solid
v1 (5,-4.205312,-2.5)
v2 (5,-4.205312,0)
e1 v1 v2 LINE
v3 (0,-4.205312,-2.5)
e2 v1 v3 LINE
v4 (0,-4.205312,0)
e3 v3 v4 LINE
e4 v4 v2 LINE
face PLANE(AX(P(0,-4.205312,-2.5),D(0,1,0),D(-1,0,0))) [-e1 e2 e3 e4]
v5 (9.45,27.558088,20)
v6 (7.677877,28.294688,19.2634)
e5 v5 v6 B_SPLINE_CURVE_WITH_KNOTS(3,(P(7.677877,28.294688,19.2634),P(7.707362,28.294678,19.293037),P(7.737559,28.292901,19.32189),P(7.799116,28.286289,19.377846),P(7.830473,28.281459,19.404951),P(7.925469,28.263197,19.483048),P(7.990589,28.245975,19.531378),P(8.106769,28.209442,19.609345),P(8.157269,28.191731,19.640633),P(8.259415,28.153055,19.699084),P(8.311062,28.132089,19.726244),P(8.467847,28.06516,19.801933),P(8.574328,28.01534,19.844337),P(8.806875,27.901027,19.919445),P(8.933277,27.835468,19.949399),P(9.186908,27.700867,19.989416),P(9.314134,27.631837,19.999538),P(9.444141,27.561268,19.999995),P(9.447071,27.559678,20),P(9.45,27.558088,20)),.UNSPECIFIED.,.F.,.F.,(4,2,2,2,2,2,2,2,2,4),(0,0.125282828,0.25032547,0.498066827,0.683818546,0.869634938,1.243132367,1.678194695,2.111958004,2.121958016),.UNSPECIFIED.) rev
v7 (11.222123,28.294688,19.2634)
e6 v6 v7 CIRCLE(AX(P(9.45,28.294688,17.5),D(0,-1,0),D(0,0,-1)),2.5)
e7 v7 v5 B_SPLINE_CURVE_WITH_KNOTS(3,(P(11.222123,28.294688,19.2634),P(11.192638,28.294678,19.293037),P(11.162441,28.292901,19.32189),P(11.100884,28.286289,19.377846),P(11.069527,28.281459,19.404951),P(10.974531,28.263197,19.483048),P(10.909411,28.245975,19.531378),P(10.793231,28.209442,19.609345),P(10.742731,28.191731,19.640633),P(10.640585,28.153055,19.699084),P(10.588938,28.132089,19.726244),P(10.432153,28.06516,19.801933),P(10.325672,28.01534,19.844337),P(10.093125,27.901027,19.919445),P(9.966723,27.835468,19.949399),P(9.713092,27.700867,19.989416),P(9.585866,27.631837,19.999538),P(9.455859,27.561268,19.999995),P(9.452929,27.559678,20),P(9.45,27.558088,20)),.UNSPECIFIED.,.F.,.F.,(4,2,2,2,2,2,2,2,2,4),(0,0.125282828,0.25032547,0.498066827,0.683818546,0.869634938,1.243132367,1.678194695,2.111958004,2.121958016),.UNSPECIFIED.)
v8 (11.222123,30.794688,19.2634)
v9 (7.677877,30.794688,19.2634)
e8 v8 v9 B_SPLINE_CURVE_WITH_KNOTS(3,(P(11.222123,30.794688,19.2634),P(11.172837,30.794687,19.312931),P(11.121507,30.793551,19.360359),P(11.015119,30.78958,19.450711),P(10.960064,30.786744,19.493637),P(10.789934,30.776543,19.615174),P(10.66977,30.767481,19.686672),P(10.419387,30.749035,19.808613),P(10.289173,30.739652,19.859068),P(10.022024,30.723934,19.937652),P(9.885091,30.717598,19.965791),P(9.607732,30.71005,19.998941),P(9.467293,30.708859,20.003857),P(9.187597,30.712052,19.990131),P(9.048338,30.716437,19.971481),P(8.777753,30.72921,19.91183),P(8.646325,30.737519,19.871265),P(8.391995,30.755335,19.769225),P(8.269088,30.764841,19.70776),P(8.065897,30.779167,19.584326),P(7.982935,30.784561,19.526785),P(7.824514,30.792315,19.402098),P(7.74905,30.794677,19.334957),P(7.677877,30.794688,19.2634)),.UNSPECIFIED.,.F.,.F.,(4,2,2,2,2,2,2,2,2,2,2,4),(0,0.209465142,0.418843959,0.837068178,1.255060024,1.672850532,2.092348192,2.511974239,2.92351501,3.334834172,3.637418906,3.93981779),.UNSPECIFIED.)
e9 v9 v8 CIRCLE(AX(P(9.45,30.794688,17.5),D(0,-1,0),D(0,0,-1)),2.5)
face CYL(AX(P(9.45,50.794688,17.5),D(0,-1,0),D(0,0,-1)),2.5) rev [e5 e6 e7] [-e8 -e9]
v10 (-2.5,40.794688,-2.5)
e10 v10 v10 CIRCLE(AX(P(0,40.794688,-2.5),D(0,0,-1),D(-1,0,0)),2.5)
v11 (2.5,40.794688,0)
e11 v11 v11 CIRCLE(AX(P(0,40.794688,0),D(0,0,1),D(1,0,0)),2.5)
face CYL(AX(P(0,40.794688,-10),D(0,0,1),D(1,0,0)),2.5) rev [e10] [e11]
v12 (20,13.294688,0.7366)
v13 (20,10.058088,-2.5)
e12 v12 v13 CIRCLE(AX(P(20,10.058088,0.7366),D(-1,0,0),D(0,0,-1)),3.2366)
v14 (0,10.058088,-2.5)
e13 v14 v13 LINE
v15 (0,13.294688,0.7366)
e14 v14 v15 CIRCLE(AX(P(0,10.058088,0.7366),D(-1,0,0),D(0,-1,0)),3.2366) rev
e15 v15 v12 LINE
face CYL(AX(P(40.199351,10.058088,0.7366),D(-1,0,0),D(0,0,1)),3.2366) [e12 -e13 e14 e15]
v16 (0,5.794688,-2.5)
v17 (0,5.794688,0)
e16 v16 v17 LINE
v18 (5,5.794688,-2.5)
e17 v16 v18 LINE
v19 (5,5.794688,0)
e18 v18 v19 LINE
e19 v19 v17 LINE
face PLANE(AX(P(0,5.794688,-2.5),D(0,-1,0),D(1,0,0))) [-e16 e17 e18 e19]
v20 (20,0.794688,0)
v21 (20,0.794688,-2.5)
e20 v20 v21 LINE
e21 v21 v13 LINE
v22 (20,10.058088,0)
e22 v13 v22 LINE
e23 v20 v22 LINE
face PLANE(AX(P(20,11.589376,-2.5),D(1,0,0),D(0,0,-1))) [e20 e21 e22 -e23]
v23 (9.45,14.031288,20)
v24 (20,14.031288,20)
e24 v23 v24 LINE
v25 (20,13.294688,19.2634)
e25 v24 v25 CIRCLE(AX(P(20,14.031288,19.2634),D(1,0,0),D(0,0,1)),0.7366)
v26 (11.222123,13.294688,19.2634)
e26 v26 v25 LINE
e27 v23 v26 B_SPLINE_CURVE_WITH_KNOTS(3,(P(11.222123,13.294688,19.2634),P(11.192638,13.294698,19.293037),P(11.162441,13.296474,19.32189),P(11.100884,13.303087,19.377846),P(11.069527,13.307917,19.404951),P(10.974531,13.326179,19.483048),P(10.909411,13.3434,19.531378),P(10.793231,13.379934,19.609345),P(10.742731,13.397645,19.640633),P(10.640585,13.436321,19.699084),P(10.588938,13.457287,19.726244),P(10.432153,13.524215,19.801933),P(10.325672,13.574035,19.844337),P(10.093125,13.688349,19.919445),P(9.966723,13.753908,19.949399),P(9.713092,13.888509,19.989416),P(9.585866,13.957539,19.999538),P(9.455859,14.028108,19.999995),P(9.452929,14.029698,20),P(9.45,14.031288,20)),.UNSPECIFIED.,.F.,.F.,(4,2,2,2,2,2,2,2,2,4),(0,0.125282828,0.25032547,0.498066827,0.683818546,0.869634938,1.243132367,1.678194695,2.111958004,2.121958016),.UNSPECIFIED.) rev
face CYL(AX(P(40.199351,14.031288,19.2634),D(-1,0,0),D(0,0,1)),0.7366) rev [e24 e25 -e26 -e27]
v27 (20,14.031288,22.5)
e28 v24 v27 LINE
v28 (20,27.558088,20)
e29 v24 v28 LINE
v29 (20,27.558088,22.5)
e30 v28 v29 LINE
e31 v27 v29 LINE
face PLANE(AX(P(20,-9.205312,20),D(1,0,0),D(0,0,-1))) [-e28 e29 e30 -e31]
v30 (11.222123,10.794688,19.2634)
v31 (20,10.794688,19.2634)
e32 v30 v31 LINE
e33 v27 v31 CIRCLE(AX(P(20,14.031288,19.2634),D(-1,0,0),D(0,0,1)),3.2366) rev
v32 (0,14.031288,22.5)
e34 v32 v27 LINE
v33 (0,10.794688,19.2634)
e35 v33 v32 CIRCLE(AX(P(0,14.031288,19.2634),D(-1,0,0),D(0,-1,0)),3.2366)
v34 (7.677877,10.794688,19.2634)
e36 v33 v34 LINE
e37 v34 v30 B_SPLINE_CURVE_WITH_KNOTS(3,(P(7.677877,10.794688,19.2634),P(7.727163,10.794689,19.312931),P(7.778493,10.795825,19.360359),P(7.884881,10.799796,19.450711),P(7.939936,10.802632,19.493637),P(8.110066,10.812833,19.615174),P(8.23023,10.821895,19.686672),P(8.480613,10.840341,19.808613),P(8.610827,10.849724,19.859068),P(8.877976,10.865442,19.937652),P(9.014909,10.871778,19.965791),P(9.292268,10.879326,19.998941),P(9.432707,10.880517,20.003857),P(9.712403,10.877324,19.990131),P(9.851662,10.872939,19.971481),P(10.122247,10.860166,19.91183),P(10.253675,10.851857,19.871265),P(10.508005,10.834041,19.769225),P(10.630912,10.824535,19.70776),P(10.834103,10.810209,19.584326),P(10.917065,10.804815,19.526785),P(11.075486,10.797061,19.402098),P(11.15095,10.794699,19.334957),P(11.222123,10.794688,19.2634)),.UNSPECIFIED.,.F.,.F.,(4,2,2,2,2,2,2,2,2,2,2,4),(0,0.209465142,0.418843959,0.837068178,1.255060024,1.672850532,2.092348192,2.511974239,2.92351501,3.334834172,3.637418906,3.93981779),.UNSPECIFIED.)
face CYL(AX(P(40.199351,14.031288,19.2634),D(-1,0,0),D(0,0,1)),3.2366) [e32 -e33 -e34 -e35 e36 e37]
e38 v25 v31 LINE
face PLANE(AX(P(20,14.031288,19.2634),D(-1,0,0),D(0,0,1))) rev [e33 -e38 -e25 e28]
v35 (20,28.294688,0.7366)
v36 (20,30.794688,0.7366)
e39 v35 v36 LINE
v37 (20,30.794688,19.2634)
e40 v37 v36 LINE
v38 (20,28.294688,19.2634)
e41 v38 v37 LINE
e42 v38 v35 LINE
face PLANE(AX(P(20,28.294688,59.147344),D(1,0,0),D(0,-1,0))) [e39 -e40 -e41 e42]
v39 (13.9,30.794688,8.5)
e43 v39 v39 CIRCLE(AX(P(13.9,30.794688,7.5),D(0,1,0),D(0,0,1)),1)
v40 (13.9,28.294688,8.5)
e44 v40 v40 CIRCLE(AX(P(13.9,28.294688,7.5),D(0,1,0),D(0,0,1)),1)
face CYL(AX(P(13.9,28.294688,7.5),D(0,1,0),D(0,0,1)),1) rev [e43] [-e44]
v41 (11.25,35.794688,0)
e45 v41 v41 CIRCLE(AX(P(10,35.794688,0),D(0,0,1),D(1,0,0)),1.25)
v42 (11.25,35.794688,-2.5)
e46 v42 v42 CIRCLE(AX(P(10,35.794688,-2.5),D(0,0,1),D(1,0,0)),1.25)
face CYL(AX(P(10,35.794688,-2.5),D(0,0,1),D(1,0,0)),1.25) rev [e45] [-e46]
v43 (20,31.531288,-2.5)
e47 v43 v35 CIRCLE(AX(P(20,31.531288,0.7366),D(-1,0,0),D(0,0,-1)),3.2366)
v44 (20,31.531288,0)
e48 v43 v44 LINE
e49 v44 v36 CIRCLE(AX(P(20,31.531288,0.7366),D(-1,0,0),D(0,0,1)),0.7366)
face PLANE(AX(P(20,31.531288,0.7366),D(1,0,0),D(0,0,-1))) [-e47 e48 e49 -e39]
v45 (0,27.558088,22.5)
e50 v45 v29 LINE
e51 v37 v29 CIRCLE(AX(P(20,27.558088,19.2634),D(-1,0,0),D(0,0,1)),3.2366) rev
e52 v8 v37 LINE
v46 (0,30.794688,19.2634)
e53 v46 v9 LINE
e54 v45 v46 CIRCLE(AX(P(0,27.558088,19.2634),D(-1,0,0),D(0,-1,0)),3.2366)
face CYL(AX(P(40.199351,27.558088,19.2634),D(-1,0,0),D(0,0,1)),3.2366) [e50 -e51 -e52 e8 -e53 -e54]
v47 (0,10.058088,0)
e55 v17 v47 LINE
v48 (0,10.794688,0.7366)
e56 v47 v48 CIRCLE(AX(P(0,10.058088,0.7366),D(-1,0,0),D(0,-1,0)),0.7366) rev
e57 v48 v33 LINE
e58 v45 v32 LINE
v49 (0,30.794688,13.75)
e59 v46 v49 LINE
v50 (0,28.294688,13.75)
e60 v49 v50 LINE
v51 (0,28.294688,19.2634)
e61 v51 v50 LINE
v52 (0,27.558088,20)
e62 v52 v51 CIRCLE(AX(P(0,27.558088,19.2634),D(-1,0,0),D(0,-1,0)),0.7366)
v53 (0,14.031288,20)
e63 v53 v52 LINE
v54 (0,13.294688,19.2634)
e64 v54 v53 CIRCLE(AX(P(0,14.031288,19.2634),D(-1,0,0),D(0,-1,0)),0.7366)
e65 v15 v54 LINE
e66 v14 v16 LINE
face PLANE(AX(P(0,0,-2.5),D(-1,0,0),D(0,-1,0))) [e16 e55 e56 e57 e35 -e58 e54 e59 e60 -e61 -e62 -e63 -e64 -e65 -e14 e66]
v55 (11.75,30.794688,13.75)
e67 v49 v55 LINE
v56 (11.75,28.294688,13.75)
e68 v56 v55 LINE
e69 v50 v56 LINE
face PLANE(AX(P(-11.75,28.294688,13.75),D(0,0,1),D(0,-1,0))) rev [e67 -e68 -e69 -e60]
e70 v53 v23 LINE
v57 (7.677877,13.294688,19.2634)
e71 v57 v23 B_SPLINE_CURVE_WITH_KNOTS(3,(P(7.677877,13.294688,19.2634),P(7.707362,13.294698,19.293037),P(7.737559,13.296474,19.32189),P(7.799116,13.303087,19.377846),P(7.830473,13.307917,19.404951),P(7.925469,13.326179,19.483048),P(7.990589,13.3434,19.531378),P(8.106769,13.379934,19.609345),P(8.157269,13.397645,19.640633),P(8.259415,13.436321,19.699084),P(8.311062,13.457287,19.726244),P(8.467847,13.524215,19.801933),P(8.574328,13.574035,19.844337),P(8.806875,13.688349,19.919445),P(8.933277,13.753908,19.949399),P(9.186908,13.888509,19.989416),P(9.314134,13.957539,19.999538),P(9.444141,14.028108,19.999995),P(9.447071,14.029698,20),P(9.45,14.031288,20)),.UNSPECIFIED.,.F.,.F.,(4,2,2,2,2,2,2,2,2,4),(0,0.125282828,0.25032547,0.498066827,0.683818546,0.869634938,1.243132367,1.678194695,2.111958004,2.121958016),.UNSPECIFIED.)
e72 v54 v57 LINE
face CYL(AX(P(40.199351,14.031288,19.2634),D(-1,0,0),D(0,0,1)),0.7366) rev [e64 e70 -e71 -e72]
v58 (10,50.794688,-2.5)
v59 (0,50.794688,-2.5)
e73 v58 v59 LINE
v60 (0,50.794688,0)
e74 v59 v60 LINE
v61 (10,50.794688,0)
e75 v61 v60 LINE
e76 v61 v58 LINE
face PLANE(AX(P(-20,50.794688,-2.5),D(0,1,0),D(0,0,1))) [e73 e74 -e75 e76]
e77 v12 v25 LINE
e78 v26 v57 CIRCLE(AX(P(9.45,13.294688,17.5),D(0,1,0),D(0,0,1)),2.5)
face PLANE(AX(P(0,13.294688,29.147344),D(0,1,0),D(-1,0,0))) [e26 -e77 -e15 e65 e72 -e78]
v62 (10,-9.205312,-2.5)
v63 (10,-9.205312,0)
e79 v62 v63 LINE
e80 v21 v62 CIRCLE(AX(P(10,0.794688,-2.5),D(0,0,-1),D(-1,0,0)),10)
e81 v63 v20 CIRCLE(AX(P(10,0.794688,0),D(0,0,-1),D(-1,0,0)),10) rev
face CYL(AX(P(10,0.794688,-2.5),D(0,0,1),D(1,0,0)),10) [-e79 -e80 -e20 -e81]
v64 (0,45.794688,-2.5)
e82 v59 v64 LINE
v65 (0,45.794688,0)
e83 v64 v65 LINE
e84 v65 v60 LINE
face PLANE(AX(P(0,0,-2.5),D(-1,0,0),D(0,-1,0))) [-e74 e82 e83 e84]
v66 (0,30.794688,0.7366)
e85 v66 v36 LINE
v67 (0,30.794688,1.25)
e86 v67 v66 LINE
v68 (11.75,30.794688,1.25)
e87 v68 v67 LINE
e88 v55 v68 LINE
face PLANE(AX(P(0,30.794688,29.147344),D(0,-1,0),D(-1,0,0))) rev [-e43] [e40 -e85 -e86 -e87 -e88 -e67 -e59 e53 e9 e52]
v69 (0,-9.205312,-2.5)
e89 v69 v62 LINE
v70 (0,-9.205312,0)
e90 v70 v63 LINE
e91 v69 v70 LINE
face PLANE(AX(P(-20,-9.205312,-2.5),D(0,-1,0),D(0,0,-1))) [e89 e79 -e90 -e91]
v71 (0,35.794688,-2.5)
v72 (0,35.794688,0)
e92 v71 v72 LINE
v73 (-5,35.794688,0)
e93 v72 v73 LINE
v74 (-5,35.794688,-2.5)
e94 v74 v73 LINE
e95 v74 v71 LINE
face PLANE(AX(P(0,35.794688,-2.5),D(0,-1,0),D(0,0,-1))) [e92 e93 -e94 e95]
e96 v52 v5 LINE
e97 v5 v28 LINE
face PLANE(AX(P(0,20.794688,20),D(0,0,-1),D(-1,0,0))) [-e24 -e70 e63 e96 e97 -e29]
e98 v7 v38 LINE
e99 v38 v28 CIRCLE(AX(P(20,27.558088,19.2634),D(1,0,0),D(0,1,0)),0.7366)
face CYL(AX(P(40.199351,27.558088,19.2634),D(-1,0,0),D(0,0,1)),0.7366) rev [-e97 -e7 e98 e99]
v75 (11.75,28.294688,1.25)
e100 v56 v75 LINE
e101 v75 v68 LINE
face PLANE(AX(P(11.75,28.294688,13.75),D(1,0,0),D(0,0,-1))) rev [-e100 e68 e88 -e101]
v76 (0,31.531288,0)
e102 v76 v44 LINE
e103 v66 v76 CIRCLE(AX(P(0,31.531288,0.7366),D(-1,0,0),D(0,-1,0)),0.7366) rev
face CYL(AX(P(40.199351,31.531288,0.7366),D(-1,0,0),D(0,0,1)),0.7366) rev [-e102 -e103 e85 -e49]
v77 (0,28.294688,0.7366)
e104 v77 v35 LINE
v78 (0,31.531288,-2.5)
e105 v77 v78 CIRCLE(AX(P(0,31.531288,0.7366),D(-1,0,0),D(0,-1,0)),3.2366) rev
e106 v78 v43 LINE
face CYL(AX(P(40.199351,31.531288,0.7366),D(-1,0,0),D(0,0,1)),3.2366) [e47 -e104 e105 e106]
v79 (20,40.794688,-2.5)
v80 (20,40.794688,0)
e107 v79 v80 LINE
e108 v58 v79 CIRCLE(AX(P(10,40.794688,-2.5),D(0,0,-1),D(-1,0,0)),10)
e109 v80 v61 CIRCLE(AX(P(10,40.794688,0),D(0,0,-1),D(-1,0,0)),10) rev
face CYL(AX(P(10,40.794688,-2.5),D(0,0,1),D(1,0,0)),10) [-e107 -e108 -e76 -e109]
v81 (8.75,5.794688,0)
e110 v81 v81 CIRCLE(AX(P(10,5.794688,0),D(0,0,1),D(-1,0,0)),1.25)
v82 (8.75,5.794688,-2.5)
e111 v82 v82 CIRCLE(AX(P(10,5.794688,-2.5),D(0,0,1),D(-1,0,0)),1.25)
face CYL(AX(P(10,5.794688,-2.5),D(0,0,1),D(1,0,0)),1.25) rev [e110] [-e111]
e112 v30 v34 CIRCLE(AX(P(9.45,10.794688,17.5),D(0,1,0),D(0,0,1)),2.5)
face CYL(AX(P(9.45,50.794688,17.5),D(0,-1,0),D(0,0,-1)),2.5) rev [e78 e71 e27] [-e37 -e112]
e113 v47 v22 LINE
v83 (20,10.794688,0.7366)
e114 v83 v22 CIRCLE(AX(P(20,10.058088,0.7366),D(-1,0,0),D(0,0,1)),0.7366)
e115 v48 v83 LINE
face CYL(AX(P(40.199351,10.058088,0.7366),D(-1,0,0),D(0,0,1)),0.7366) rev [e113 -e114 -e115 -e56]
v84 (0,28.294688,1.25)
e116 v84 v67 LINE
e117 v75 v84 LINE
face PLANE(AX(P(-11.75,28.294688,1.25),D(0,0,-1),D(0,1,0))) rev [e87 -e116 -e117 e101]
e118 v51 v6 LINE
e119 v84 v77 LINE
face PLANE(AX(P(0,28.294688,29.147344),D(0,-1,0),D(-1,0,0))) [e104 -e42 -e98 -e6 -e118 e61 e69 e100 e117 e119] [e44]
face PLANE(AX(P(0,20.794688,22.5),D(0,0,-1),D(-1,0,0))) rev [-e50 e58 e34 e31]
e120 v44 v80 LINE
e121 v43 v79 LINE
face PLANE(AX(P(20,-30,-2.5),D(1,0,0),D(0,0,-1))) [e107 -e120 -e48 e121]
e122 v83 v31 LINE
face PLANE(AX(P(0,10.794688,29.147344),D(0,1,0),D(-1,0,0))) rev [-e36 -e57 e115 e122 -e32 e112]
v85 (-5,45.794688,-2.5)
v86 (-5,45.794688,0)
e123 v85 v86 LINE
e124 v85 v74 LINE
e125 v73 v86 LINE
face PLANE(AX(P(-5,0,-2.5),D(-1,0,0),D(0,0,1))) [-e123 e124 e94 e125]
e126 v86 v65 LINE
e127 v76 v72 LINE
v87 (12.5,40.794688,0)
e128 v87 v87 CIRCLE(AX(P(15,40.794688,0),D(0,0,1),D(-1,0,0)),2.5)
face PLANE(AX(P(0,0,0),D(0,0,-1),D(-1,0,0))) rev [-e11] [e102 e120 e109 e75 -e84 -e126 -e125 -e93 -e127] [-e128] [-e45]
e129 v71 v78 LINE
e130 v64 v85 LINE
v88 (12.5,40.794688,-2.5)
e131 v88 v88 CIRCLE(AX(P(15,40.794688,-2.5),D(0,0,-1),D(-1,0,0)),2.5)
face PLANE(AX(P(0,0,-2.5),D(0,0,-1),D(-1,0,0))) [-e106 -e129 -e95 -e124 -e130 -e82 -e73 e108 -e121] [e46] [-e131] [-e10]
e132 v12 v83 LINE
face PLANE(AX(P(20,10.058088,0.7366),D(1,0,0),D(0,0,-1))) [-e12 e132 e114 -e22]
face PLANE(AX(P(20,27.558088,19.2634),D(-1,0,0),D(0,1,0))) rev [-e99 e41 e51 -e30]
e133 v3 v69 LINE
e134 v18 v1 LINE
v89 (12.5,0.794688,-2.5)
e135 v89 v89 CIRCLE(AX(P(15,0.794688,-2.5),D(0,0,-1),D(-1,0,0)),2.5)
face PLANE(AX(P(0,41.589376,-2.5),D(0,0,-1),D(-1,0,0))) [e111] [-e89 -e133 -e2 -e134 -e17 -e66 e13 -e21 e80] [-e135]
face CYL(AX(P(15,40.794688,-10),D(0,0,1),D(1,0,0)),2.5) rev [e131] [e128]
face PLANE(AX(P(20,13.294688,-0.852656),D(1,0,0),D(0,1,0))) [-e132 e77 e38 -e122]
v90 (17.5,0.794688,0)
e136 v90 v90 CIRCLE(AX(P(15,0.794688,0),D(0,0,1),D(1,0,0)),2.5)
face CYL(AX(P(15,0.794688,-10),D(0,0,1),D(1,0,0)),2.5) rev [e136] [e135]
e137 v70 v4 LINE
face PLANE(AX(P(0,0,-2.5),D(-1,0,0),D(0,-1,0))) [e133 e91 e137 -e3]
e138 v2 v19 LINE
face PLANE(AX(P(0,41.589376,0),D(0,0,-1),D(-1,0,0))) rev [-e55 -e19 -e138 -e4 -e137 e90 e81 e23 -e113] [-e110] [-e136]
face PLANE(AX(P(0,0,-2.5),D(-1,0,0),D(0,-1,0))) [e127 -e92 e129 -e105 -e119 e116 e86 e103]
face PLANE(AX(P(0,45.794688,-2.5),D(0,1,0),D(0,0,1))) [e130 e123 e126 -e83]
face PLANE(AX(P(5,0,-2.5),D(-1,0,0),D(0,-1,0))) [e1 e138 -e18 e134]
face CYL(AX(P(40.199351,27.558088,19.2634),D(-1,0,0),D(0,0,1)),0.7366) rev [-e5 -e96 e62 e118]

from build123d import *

# Parameters (mm, degrees)
SKETCH1_W           = 40
SKETCH1_H           = 60
SKETCH1_R           = 1.25
BASE_FLANGE1_DEPTH  = 2.5
SKETCH15_R          = 1
CUT_EXTRUDE3_DEPTH  = 10
JOG3_START          = -2.5
JOG3_OUTLINE_W      = 40
JOG3_OUTLINE_H      = 58.294687966
JOG3_OUTLINE_R      = 1
JOG3_OUTLINE_R_2    = 1.25
JOG3_DEPTH          = 2.5
JOG3_2_OUTLINE_W    = 40
JOG3_2_OUTLINE_H    = 1.705312034
JOG3_2_DEPTH        = 0.332528284
JOG3_START_2        = 19.2634
JOG3_3_OUTLINE_W    = 40
JOG3_3_OUTLINE_H    = 40
JOG3_3_OUTLINE_R    = 1
JOG3_3_OUTLINE_R_2  = 1.25
JOG3_3_DEPTH        = 3.2366
JOG3_4_OUTLINE_W    = 40
JOG3_4_OUTLINE_H    = 20.794687966
JOG3_4_OUTLINE_R    = 1.25
JOG3_4_DEPTH        = 3.2366
JOG3_5_OUTLINE_W    = 40
JOG3_5_OUTLINE_H    = 2.5
JOG3_5_DEPTH        = 20
JOG3_START_3        = 20
JOG3_6_OUTLINE_R    = 1.25
JOG3_6_OUTLINE_R_2  = 1
JOG3_6_DEPTH        = 2.5
JOG3_START_4        = -20
JOG3_7_DEPTH        = 40
JOG4_START          = -20
JOG4_DEPTH          = 40
JOG4_2_DEPTH        = 40
JOG4_START_2        = -3
JOG4_3_OUTLINE_R    = 1.25
JOG4_3_DEPTH        = 4
FILLET1_R           = 10
SKETCH18_R          = 2.5
BOSS_EXTRUDE1_DEPTH = 2.5
SKETCH19_R          = 1
SKETCH19_W          = 23.5
SKETCH19_H          = 12.5
CUT_EXTRUDE4_DEPTH  = 2.5
SKETCH20_R          = 2.5
CUT_EXTRUDE6_DEPTH  = 10
SKETCH23_R          = 2.5
CUT_EXTRUDE7_DEPTH  = 51.062460986
SKETCH24_R          = 5
CUT_EXTRUDE8_DEPTH  = 1.25
SKETCH26_R          = 2.5
CUT_EXTRUDE12_DEPTH = 51.062460987
SKETCH27_W          = 20
SKETCH27_H          = 13.5268
CUT_EXTRUDE13_DEPTH = 61.042487703


with BuildPart() as part:
    # Base-Flange1: sheet metal written as solids
    # Sketch1 → Base-Flange1 (new body)
    with BuildSketch(Plane.XY):
        Rectangle(SKETCH1_W, SKETCH1_H)
        with Locations((10, 15)):
            Circle(SKETCH1_R, mode=Mode.SUBTRACT)
        with Locations(Location((10, -15, 0), (0, 0, 180))):
            Circle(SKETCH1_R, mode=Mode.SUBTRACT)
        with Locations((-10, -15)):
            Circle(SKETCH1_R, mode=Mode.SUBTRACT)
        with Locations(Location((-10, 15, 0), (0, 0, 180))):
            Circle(SKETCH1_R, mode=Mode.SUBTRACT)
    extrude(amount=-BASE_FLANGE1_DEPTH)

    # Sketch15 → Cut-Extrude3 (cut)
    with BuildSketch(Plane.XY):
        with Locations((12, 0)):
            Circle(SKETCH15_R)
        with Locations(Location((-17, 0, 0), (0, 0, 180))):
            Circle(SKETCH15_R)
    extrude(amount=-CUT_EXTRUDE3_DEPTH, mode=Mode.SUBTRACT)

    # Jog3: read off the stored shape, not the designer's step
    # Jog3 outline → Jog3 (cut)
    with BuildSketch(Plane.XY.offset(JOG3_START)):
        with Locations((0, -0.852656017)):
            Rectangle(JOG3_OUTLINE_W, JOG3_OUTLINE_H)
        with Locations((-17, 0)):
            Circle(JOG3_OUTLINE_R, mode=Mode.SUBTRACT)
        with Locations((12, 0)):
            Circle(JOG3_OUTLINE_R, mode=Mode.SUBTRACT)
        with Locations((-10, 15)):
            Circle(JOG3_OUTLINE_R_2, mode=Mode.SUBTRACT)
        with Locations((10, 15)):
            Circle(JOG3_OUTLINE_R_2, mode=Mode.SUBTRACT)
        with Locations((10, -15)):
            Circle(JOG3_OUTLINE_R_2, mode=Mode.SUBTRACT)
        with Locations((-10, -15)):
            Circle(JOG3_OUTLINE_R_2, mode=Mode.SUBTRACT)
    extrude(amount=JOG3_DEPTH, mode=Mode.SUBTRACT)

    # Jog3 2 outline → Jog3 2 (cut)
    with BuildSketch(Plane.XY.offset(JOG3_START)):
        with Locations((0, 29.147343983)):
            Rectangle(JOG3_2_OUTLINE_W, JOG3_2_OUTLINE_H)
    extrude(amount=JOG3_2_DEPTH, mode=Mode.SUBTRACT)

    # Jog3 4 outline → Jog3 4 (add)
    with BuildSketch(Plane.XY.offset(JOG3_START)):
        with Locations((0, 40.397343983)):
            Rectangle(JOG3_4_OUTLINE_W, JOG3_4_OUTLINE_H)
        with Locations((10, 35.794687966)):
            Circle(JOG3_4_OUTLINE_R, mode=Mode.SUBTRACT)
        with Locations((-10, 35.794687966)):
            Circle(JOG3_4_OUTLINE_R, mode=Mode.SUBTRACT)
    extrude(amount=JOG3_4_DEPTH)



with BuildPart() as body_2:
    # Jog3 3 outline → Jog3 3 (new body)
    with BuildSketch(Plane.XY.offset(JOG3_START_2)):
        with Locations((0, 10.794687966)):
            Rectangle(JOG3_3_OUTLINE_W, JOG3_3_OUTLINE_H)
        with Locations((12, 20.794687966)):
            Circle(JOG3_3_OUTLINE_R, mode=Mode.SUBTRACT)
        with Locations((-17, 0)):
            Circle(JOG3_3_OUTLINE_R, mode=Mode.SUBTRACT)
        with Locations((-10, 5.794687966)):
            Circle(JOG3_3_OUTLINE_R_2, mode=Mode.SUBTRACT)
        with Locations((12, 0)):
            Circle(JOG3_3_OUTLINE_R, mode=Mode.SUBTRACT)
        with Locations((10, 5.794687966)):
            Circle(JOG3_3_OUTLINE_R_2, mode=Mode.SUBTRACT)
        with Locations((-17, 20.794687966)):
            Circle(JOG3_3_OUTLINE_R, mode=Mode.SUBTRACT)
        with Locations((-10, 15)):
            Circle(JOG3_3_OUTLINE_R_2, mode=Mode.SUBTRACT)
        with Locations((10, 15)):
            Circle(JOG3_3_OUTLINE_R_2, mode=Mode.SUBTRACT)
    extrude(amount=JOG3_3_DEPTH)


with BuildPart() as part_1:
    add(part.part)

    add(body_2.part)  # Jog3 5 merges body 2
    # Jog3 5 outline → Jog3 5 (add)
    with BuildSketch(Plane.XY):
        with Locations((0, 29.544687966)):
            Rectangle(JOG3_5_OUTLINE_W, JOG3_5_OUTLINE_H)
    extrude(amount=JOG3_5_DEPTH)

    # Jog3 6 outline → Jog3 6 (add)
    with BuildSketch(Plane.XY.offset(JOG3_START_3)):
        with Locations((10, 15)):
            Circle(JOG3_6_OUTLINE_R)
        with Locations((-10, 15)):
            Circle(JOG3_6_OUTLINE_R)
        with Locations((12, 0)):
            Circle(JOG3_6_OUTLINE_R_2)
        with Locations((-17, 0)):
            Circle(JOG3_6_OUTLINE_R_2)
    extrude(amount=JOG3_6_DEPTH)

    # Jog3 7 outline → Jog3 7 (cut)
    with BuildSketch(Plane.YZ.offset(JOG3_START_4)):
        with BuildLine():
            ThreePointArc((28.294687966, 19.2634), (28.078942821, 19.784254855), (27.558087966, 20))
            Line((27.558087966, 20), (-9.205312034, 20))
            Line((-9.205312034, 20), (-9.205312034, 19.2634))
            Line((-9.205312034, 19.2634), (28.294687966, 19.2634))
        make_face()
        with BuildLine():
            ThreePointArc((31.531287966, -2.5), (29.242666158, -1.552021808), (28.294687966, 0.7366))
            Line((28.294687966, 0.7366), (28.294687966, -2.167471716))
            Line((28.294687966, -2.167471716), (30, -2.167471716))
            Line((30, -2.167471716), (30, -2.5))
            Line((30, -2.5), (31.531287966, -2.5))
        make_face()
        with BuildLine():
            Line((31.531287966, 0), (50.794687966, 0))
            Line((50.794687966, 0), (50.794687966, 0.7366))
            Line((50.794687966, 0.7366), (30.794687966, 0.7366))
            ThreePointArc((30.794687966, 0.7366), (31.010433111, 0.215745145), (31.531287966, 0))
        make_face()
        with BuildLine():
            Line((30.794687966, 22.5), (27.558087966, 22.5))
            ThreePointArc((27.558087966, 22.5), (29.846709774, 21.552021808), (30.794687966, 19.2634))
            Line((30.794687966, 19.2634), (30.794687966, 22.5))
        make_face()
    extrude(amount=JOG3_7_DEPTH, mode=Mode.SUBTRACT)

    # Jog4: read off the stored shape, not the designer's step
    # Jog4 outline → Jog4 (cut)
    with BuildSketch(Plane.YZ.offset(JOG4_START)):
        with BuildLine():
            Line((-9.205312034, 20), (10.87962174, 20))
            ThreePointArc((10.87962174, 20), (12.019882984, 21.799110859), (14.031287966, 22.5))
            Line((14.031287966, 22.5), (-9.205312034, 22.5))
            Line((-9.205312034, 22.5), (-9.205312034, 20))
        make_face()
    extrude(amount=JOG4_DEPTH, mode=Mode.SUBTRACT)

    # Jog4 2 outline → Jog4 2 (add)
    with BuildSketch(Plane.YZ.offset(JOG4_START)):
        with BuildLine():
            Line((-9.205312034, 0), (-9.205312034, -2.5))
            Line((-9.205312034, -2.5), (10.058087966, -2.5))
            ThreePointArc((10.058087966, -2.5), (12.346709774, -1.552021808), (13.294687966, 0.7366))
            Line((13.294687966, 0.7366), (13.294687966, 19.2634))
            ThreePointArc((13.294687966, 19.2634), (13.510433111, 19.784254855), (14.031287966, 20))
            Line((14.031287966, 20), (10.87962174, 20))
            ThreePointArc((10.87962174, 20), (10.81599152, 19.634140241), (10.794687966, 19.2634))
            Line((10.794687966, 19.2634), (10.794687966, 0.7366))
            ThreePointArc((10.794687966, 0.7366), (10.578942821, 0.215745145), (10.058087966, 0))
            Line((10.058087966, 0), (-9.205312034, 0))
        make_face()
    extrude(amount=JOG4_2_DEPTH)

    # Jog4 3 outline → Jog4 3 (cut)
    with BuildSketch(Plane.XY.offset(JOG4_START_2)):
        with Locations((-10, 5.794687966)):
            Circle(JOG4_3_OUTLINE_R)
        with Locations((10, 5.794687966)):
            Circle(JOG4_3_OUTLINE_R)
    extrude(amount=JOG4_3_DEPTH, mode=Mode.SUBTRACT)

    # Fillet1
    fillet1_edges = [part_1.edges().sort_by_distance(p)[0] for p in [
        (20, -9.205312034, -1.25),
        (-20, -9.205312034, -1.25),
        (-20, 50.794687966, -1.25),
        (20, 50.794687966, -1.25),
    ]]
    fillet(fillet1_edges, radius=FILLET1_R)

    # Sketch18 → Boss-Extrude1 (add)
    with BuildSketch(Plane.XY.offset(22.5)):
        with Locations((12, 20.794687966)):
            Circle(SKETCH18_R)
        with Locations((-17, 20.794687966)):
            Circle(SKETCH18_R)
    extrude(amount=-BOSS_EXTRUDE1_DEPTH)

    # Sketch19 → Cut-Extrude4 (cut)
    with BuildSketch(Plane(origin=(0, 30.794687966, 0), x_dir=(1, 0, 0), z_dir=(0, 1, 0))):
        with Locations(Location((13.9, -7.5, 0), (0, 0, 270))):
            Circle(SKETCH19_R)
        with Locations(Location((-13.9, -7.5, 0), (0, 0, 90))):
            Circle(SKETCH19_R)
        with Locations((0, -7.5)):
            Rectangle(SKETCH19_W, SKETCH19_H)
    extrude(amount=-CUT_EXTRUDE4_DEPTH, mode=Mode.SUBTRACT)

    # Sketch20 → Cut-Extrude6 (cut)
    with BuildSketch(Plane.XY):
        with Locations((0, 40.794687966)):
            Circle(SKETCH20_R)
        with Locations(Location((0, 0.794687966, 0), (0, 0, 180))):
            Circle(SKETCH20_R)
        with Locations((15, 0.794687966)):
            Circle(SKETCH20_R)
        with Locations(Location((-15, 0.794687966, 0), (0, 0, 180))):
            Circle(SKETCH20_R)
        with Locations(Location((15, 40.794687966, 0), (0, 0, 180))):
            Circle(SKETCH20_R)
        with Locations((-15, 40.794687966)):
            Circle(SKETCH20_R)
    extrude(amount=-CUT_EXTRUDE6_DEPTH, mode=Mode.SUBTRACT)

    # Sketch23 → Cut-Extrude7 (cut, through all)
    with BuildSketch(Plane(origin=(0, 30.794687966, 0), x_dir=(1, 0, 0), z_dir=(0, 1, 0))):
        with Locations(Location((-5.55, -7.5, 0), (0, 0, 270))):
            Circle(SKETCH23_R)
    extrude(amount=-CUT_EXTRUDE7_DEPTH, mode=Mode.SUBTRACT)

    # Sketch24 → Cut-Extrude8 (cut)
    with BuildSketch(Plane(origin=(0, 13.294687966, 0), x_dir=(1, 0, 0), z_dir=(0, 1, 0))):
        with Locations(Location((-5.55, -7.5, 0), (0, 0, 270))):
            Circle(SKETCH24_R)
    extrude(amount=-CUT_EXTRUDE8_DEPTH, mode=Mode.SUBTRACT)

    # Sketch26 → Cut-Extrude12 (cut, through all)
    with BuildSketch(Plane.XZ.offset(-10.794687966)):
        with Locations(Location((9.45, 17.5, 0), (0, 0, 135.141364755))):
            Circle(SKETCH26_R)
    extrude(amount=-CUT_EXTRUDE12_DEPTH, mode=Mode.SUBTRACT)

    # Sketch27 → Cut-Extrude13 (cut, through all)
    with BuildSketch(Plane.XY.offset(22.5)):
        with Locations((-10, 20.794687966)):
            Rectangle(SKETCH27_W, SKETCH27_H)
        Polygon((0, 45.794687966), (0, 50.794687966), (-20, 50.794687966), (-20, 27.558087966), (0, 27.558087966), (0, 35.794687966), (-5, 35.794687966), (-5, 45.794687966), align=None)
        Polygon((0, 14.031287966), (-20, 14.031287966), (-20, -9.205312034), (0, -9.205312034), (0, -4.205312034), (5, -4.205312034), (5, 5.794687966), (0, 5.794687966), align=None)
    extrude(amount=-CUT_EXTRUDE13_DEPTH, mode=Mode.SUBTRACT)


solid = part_1.part
